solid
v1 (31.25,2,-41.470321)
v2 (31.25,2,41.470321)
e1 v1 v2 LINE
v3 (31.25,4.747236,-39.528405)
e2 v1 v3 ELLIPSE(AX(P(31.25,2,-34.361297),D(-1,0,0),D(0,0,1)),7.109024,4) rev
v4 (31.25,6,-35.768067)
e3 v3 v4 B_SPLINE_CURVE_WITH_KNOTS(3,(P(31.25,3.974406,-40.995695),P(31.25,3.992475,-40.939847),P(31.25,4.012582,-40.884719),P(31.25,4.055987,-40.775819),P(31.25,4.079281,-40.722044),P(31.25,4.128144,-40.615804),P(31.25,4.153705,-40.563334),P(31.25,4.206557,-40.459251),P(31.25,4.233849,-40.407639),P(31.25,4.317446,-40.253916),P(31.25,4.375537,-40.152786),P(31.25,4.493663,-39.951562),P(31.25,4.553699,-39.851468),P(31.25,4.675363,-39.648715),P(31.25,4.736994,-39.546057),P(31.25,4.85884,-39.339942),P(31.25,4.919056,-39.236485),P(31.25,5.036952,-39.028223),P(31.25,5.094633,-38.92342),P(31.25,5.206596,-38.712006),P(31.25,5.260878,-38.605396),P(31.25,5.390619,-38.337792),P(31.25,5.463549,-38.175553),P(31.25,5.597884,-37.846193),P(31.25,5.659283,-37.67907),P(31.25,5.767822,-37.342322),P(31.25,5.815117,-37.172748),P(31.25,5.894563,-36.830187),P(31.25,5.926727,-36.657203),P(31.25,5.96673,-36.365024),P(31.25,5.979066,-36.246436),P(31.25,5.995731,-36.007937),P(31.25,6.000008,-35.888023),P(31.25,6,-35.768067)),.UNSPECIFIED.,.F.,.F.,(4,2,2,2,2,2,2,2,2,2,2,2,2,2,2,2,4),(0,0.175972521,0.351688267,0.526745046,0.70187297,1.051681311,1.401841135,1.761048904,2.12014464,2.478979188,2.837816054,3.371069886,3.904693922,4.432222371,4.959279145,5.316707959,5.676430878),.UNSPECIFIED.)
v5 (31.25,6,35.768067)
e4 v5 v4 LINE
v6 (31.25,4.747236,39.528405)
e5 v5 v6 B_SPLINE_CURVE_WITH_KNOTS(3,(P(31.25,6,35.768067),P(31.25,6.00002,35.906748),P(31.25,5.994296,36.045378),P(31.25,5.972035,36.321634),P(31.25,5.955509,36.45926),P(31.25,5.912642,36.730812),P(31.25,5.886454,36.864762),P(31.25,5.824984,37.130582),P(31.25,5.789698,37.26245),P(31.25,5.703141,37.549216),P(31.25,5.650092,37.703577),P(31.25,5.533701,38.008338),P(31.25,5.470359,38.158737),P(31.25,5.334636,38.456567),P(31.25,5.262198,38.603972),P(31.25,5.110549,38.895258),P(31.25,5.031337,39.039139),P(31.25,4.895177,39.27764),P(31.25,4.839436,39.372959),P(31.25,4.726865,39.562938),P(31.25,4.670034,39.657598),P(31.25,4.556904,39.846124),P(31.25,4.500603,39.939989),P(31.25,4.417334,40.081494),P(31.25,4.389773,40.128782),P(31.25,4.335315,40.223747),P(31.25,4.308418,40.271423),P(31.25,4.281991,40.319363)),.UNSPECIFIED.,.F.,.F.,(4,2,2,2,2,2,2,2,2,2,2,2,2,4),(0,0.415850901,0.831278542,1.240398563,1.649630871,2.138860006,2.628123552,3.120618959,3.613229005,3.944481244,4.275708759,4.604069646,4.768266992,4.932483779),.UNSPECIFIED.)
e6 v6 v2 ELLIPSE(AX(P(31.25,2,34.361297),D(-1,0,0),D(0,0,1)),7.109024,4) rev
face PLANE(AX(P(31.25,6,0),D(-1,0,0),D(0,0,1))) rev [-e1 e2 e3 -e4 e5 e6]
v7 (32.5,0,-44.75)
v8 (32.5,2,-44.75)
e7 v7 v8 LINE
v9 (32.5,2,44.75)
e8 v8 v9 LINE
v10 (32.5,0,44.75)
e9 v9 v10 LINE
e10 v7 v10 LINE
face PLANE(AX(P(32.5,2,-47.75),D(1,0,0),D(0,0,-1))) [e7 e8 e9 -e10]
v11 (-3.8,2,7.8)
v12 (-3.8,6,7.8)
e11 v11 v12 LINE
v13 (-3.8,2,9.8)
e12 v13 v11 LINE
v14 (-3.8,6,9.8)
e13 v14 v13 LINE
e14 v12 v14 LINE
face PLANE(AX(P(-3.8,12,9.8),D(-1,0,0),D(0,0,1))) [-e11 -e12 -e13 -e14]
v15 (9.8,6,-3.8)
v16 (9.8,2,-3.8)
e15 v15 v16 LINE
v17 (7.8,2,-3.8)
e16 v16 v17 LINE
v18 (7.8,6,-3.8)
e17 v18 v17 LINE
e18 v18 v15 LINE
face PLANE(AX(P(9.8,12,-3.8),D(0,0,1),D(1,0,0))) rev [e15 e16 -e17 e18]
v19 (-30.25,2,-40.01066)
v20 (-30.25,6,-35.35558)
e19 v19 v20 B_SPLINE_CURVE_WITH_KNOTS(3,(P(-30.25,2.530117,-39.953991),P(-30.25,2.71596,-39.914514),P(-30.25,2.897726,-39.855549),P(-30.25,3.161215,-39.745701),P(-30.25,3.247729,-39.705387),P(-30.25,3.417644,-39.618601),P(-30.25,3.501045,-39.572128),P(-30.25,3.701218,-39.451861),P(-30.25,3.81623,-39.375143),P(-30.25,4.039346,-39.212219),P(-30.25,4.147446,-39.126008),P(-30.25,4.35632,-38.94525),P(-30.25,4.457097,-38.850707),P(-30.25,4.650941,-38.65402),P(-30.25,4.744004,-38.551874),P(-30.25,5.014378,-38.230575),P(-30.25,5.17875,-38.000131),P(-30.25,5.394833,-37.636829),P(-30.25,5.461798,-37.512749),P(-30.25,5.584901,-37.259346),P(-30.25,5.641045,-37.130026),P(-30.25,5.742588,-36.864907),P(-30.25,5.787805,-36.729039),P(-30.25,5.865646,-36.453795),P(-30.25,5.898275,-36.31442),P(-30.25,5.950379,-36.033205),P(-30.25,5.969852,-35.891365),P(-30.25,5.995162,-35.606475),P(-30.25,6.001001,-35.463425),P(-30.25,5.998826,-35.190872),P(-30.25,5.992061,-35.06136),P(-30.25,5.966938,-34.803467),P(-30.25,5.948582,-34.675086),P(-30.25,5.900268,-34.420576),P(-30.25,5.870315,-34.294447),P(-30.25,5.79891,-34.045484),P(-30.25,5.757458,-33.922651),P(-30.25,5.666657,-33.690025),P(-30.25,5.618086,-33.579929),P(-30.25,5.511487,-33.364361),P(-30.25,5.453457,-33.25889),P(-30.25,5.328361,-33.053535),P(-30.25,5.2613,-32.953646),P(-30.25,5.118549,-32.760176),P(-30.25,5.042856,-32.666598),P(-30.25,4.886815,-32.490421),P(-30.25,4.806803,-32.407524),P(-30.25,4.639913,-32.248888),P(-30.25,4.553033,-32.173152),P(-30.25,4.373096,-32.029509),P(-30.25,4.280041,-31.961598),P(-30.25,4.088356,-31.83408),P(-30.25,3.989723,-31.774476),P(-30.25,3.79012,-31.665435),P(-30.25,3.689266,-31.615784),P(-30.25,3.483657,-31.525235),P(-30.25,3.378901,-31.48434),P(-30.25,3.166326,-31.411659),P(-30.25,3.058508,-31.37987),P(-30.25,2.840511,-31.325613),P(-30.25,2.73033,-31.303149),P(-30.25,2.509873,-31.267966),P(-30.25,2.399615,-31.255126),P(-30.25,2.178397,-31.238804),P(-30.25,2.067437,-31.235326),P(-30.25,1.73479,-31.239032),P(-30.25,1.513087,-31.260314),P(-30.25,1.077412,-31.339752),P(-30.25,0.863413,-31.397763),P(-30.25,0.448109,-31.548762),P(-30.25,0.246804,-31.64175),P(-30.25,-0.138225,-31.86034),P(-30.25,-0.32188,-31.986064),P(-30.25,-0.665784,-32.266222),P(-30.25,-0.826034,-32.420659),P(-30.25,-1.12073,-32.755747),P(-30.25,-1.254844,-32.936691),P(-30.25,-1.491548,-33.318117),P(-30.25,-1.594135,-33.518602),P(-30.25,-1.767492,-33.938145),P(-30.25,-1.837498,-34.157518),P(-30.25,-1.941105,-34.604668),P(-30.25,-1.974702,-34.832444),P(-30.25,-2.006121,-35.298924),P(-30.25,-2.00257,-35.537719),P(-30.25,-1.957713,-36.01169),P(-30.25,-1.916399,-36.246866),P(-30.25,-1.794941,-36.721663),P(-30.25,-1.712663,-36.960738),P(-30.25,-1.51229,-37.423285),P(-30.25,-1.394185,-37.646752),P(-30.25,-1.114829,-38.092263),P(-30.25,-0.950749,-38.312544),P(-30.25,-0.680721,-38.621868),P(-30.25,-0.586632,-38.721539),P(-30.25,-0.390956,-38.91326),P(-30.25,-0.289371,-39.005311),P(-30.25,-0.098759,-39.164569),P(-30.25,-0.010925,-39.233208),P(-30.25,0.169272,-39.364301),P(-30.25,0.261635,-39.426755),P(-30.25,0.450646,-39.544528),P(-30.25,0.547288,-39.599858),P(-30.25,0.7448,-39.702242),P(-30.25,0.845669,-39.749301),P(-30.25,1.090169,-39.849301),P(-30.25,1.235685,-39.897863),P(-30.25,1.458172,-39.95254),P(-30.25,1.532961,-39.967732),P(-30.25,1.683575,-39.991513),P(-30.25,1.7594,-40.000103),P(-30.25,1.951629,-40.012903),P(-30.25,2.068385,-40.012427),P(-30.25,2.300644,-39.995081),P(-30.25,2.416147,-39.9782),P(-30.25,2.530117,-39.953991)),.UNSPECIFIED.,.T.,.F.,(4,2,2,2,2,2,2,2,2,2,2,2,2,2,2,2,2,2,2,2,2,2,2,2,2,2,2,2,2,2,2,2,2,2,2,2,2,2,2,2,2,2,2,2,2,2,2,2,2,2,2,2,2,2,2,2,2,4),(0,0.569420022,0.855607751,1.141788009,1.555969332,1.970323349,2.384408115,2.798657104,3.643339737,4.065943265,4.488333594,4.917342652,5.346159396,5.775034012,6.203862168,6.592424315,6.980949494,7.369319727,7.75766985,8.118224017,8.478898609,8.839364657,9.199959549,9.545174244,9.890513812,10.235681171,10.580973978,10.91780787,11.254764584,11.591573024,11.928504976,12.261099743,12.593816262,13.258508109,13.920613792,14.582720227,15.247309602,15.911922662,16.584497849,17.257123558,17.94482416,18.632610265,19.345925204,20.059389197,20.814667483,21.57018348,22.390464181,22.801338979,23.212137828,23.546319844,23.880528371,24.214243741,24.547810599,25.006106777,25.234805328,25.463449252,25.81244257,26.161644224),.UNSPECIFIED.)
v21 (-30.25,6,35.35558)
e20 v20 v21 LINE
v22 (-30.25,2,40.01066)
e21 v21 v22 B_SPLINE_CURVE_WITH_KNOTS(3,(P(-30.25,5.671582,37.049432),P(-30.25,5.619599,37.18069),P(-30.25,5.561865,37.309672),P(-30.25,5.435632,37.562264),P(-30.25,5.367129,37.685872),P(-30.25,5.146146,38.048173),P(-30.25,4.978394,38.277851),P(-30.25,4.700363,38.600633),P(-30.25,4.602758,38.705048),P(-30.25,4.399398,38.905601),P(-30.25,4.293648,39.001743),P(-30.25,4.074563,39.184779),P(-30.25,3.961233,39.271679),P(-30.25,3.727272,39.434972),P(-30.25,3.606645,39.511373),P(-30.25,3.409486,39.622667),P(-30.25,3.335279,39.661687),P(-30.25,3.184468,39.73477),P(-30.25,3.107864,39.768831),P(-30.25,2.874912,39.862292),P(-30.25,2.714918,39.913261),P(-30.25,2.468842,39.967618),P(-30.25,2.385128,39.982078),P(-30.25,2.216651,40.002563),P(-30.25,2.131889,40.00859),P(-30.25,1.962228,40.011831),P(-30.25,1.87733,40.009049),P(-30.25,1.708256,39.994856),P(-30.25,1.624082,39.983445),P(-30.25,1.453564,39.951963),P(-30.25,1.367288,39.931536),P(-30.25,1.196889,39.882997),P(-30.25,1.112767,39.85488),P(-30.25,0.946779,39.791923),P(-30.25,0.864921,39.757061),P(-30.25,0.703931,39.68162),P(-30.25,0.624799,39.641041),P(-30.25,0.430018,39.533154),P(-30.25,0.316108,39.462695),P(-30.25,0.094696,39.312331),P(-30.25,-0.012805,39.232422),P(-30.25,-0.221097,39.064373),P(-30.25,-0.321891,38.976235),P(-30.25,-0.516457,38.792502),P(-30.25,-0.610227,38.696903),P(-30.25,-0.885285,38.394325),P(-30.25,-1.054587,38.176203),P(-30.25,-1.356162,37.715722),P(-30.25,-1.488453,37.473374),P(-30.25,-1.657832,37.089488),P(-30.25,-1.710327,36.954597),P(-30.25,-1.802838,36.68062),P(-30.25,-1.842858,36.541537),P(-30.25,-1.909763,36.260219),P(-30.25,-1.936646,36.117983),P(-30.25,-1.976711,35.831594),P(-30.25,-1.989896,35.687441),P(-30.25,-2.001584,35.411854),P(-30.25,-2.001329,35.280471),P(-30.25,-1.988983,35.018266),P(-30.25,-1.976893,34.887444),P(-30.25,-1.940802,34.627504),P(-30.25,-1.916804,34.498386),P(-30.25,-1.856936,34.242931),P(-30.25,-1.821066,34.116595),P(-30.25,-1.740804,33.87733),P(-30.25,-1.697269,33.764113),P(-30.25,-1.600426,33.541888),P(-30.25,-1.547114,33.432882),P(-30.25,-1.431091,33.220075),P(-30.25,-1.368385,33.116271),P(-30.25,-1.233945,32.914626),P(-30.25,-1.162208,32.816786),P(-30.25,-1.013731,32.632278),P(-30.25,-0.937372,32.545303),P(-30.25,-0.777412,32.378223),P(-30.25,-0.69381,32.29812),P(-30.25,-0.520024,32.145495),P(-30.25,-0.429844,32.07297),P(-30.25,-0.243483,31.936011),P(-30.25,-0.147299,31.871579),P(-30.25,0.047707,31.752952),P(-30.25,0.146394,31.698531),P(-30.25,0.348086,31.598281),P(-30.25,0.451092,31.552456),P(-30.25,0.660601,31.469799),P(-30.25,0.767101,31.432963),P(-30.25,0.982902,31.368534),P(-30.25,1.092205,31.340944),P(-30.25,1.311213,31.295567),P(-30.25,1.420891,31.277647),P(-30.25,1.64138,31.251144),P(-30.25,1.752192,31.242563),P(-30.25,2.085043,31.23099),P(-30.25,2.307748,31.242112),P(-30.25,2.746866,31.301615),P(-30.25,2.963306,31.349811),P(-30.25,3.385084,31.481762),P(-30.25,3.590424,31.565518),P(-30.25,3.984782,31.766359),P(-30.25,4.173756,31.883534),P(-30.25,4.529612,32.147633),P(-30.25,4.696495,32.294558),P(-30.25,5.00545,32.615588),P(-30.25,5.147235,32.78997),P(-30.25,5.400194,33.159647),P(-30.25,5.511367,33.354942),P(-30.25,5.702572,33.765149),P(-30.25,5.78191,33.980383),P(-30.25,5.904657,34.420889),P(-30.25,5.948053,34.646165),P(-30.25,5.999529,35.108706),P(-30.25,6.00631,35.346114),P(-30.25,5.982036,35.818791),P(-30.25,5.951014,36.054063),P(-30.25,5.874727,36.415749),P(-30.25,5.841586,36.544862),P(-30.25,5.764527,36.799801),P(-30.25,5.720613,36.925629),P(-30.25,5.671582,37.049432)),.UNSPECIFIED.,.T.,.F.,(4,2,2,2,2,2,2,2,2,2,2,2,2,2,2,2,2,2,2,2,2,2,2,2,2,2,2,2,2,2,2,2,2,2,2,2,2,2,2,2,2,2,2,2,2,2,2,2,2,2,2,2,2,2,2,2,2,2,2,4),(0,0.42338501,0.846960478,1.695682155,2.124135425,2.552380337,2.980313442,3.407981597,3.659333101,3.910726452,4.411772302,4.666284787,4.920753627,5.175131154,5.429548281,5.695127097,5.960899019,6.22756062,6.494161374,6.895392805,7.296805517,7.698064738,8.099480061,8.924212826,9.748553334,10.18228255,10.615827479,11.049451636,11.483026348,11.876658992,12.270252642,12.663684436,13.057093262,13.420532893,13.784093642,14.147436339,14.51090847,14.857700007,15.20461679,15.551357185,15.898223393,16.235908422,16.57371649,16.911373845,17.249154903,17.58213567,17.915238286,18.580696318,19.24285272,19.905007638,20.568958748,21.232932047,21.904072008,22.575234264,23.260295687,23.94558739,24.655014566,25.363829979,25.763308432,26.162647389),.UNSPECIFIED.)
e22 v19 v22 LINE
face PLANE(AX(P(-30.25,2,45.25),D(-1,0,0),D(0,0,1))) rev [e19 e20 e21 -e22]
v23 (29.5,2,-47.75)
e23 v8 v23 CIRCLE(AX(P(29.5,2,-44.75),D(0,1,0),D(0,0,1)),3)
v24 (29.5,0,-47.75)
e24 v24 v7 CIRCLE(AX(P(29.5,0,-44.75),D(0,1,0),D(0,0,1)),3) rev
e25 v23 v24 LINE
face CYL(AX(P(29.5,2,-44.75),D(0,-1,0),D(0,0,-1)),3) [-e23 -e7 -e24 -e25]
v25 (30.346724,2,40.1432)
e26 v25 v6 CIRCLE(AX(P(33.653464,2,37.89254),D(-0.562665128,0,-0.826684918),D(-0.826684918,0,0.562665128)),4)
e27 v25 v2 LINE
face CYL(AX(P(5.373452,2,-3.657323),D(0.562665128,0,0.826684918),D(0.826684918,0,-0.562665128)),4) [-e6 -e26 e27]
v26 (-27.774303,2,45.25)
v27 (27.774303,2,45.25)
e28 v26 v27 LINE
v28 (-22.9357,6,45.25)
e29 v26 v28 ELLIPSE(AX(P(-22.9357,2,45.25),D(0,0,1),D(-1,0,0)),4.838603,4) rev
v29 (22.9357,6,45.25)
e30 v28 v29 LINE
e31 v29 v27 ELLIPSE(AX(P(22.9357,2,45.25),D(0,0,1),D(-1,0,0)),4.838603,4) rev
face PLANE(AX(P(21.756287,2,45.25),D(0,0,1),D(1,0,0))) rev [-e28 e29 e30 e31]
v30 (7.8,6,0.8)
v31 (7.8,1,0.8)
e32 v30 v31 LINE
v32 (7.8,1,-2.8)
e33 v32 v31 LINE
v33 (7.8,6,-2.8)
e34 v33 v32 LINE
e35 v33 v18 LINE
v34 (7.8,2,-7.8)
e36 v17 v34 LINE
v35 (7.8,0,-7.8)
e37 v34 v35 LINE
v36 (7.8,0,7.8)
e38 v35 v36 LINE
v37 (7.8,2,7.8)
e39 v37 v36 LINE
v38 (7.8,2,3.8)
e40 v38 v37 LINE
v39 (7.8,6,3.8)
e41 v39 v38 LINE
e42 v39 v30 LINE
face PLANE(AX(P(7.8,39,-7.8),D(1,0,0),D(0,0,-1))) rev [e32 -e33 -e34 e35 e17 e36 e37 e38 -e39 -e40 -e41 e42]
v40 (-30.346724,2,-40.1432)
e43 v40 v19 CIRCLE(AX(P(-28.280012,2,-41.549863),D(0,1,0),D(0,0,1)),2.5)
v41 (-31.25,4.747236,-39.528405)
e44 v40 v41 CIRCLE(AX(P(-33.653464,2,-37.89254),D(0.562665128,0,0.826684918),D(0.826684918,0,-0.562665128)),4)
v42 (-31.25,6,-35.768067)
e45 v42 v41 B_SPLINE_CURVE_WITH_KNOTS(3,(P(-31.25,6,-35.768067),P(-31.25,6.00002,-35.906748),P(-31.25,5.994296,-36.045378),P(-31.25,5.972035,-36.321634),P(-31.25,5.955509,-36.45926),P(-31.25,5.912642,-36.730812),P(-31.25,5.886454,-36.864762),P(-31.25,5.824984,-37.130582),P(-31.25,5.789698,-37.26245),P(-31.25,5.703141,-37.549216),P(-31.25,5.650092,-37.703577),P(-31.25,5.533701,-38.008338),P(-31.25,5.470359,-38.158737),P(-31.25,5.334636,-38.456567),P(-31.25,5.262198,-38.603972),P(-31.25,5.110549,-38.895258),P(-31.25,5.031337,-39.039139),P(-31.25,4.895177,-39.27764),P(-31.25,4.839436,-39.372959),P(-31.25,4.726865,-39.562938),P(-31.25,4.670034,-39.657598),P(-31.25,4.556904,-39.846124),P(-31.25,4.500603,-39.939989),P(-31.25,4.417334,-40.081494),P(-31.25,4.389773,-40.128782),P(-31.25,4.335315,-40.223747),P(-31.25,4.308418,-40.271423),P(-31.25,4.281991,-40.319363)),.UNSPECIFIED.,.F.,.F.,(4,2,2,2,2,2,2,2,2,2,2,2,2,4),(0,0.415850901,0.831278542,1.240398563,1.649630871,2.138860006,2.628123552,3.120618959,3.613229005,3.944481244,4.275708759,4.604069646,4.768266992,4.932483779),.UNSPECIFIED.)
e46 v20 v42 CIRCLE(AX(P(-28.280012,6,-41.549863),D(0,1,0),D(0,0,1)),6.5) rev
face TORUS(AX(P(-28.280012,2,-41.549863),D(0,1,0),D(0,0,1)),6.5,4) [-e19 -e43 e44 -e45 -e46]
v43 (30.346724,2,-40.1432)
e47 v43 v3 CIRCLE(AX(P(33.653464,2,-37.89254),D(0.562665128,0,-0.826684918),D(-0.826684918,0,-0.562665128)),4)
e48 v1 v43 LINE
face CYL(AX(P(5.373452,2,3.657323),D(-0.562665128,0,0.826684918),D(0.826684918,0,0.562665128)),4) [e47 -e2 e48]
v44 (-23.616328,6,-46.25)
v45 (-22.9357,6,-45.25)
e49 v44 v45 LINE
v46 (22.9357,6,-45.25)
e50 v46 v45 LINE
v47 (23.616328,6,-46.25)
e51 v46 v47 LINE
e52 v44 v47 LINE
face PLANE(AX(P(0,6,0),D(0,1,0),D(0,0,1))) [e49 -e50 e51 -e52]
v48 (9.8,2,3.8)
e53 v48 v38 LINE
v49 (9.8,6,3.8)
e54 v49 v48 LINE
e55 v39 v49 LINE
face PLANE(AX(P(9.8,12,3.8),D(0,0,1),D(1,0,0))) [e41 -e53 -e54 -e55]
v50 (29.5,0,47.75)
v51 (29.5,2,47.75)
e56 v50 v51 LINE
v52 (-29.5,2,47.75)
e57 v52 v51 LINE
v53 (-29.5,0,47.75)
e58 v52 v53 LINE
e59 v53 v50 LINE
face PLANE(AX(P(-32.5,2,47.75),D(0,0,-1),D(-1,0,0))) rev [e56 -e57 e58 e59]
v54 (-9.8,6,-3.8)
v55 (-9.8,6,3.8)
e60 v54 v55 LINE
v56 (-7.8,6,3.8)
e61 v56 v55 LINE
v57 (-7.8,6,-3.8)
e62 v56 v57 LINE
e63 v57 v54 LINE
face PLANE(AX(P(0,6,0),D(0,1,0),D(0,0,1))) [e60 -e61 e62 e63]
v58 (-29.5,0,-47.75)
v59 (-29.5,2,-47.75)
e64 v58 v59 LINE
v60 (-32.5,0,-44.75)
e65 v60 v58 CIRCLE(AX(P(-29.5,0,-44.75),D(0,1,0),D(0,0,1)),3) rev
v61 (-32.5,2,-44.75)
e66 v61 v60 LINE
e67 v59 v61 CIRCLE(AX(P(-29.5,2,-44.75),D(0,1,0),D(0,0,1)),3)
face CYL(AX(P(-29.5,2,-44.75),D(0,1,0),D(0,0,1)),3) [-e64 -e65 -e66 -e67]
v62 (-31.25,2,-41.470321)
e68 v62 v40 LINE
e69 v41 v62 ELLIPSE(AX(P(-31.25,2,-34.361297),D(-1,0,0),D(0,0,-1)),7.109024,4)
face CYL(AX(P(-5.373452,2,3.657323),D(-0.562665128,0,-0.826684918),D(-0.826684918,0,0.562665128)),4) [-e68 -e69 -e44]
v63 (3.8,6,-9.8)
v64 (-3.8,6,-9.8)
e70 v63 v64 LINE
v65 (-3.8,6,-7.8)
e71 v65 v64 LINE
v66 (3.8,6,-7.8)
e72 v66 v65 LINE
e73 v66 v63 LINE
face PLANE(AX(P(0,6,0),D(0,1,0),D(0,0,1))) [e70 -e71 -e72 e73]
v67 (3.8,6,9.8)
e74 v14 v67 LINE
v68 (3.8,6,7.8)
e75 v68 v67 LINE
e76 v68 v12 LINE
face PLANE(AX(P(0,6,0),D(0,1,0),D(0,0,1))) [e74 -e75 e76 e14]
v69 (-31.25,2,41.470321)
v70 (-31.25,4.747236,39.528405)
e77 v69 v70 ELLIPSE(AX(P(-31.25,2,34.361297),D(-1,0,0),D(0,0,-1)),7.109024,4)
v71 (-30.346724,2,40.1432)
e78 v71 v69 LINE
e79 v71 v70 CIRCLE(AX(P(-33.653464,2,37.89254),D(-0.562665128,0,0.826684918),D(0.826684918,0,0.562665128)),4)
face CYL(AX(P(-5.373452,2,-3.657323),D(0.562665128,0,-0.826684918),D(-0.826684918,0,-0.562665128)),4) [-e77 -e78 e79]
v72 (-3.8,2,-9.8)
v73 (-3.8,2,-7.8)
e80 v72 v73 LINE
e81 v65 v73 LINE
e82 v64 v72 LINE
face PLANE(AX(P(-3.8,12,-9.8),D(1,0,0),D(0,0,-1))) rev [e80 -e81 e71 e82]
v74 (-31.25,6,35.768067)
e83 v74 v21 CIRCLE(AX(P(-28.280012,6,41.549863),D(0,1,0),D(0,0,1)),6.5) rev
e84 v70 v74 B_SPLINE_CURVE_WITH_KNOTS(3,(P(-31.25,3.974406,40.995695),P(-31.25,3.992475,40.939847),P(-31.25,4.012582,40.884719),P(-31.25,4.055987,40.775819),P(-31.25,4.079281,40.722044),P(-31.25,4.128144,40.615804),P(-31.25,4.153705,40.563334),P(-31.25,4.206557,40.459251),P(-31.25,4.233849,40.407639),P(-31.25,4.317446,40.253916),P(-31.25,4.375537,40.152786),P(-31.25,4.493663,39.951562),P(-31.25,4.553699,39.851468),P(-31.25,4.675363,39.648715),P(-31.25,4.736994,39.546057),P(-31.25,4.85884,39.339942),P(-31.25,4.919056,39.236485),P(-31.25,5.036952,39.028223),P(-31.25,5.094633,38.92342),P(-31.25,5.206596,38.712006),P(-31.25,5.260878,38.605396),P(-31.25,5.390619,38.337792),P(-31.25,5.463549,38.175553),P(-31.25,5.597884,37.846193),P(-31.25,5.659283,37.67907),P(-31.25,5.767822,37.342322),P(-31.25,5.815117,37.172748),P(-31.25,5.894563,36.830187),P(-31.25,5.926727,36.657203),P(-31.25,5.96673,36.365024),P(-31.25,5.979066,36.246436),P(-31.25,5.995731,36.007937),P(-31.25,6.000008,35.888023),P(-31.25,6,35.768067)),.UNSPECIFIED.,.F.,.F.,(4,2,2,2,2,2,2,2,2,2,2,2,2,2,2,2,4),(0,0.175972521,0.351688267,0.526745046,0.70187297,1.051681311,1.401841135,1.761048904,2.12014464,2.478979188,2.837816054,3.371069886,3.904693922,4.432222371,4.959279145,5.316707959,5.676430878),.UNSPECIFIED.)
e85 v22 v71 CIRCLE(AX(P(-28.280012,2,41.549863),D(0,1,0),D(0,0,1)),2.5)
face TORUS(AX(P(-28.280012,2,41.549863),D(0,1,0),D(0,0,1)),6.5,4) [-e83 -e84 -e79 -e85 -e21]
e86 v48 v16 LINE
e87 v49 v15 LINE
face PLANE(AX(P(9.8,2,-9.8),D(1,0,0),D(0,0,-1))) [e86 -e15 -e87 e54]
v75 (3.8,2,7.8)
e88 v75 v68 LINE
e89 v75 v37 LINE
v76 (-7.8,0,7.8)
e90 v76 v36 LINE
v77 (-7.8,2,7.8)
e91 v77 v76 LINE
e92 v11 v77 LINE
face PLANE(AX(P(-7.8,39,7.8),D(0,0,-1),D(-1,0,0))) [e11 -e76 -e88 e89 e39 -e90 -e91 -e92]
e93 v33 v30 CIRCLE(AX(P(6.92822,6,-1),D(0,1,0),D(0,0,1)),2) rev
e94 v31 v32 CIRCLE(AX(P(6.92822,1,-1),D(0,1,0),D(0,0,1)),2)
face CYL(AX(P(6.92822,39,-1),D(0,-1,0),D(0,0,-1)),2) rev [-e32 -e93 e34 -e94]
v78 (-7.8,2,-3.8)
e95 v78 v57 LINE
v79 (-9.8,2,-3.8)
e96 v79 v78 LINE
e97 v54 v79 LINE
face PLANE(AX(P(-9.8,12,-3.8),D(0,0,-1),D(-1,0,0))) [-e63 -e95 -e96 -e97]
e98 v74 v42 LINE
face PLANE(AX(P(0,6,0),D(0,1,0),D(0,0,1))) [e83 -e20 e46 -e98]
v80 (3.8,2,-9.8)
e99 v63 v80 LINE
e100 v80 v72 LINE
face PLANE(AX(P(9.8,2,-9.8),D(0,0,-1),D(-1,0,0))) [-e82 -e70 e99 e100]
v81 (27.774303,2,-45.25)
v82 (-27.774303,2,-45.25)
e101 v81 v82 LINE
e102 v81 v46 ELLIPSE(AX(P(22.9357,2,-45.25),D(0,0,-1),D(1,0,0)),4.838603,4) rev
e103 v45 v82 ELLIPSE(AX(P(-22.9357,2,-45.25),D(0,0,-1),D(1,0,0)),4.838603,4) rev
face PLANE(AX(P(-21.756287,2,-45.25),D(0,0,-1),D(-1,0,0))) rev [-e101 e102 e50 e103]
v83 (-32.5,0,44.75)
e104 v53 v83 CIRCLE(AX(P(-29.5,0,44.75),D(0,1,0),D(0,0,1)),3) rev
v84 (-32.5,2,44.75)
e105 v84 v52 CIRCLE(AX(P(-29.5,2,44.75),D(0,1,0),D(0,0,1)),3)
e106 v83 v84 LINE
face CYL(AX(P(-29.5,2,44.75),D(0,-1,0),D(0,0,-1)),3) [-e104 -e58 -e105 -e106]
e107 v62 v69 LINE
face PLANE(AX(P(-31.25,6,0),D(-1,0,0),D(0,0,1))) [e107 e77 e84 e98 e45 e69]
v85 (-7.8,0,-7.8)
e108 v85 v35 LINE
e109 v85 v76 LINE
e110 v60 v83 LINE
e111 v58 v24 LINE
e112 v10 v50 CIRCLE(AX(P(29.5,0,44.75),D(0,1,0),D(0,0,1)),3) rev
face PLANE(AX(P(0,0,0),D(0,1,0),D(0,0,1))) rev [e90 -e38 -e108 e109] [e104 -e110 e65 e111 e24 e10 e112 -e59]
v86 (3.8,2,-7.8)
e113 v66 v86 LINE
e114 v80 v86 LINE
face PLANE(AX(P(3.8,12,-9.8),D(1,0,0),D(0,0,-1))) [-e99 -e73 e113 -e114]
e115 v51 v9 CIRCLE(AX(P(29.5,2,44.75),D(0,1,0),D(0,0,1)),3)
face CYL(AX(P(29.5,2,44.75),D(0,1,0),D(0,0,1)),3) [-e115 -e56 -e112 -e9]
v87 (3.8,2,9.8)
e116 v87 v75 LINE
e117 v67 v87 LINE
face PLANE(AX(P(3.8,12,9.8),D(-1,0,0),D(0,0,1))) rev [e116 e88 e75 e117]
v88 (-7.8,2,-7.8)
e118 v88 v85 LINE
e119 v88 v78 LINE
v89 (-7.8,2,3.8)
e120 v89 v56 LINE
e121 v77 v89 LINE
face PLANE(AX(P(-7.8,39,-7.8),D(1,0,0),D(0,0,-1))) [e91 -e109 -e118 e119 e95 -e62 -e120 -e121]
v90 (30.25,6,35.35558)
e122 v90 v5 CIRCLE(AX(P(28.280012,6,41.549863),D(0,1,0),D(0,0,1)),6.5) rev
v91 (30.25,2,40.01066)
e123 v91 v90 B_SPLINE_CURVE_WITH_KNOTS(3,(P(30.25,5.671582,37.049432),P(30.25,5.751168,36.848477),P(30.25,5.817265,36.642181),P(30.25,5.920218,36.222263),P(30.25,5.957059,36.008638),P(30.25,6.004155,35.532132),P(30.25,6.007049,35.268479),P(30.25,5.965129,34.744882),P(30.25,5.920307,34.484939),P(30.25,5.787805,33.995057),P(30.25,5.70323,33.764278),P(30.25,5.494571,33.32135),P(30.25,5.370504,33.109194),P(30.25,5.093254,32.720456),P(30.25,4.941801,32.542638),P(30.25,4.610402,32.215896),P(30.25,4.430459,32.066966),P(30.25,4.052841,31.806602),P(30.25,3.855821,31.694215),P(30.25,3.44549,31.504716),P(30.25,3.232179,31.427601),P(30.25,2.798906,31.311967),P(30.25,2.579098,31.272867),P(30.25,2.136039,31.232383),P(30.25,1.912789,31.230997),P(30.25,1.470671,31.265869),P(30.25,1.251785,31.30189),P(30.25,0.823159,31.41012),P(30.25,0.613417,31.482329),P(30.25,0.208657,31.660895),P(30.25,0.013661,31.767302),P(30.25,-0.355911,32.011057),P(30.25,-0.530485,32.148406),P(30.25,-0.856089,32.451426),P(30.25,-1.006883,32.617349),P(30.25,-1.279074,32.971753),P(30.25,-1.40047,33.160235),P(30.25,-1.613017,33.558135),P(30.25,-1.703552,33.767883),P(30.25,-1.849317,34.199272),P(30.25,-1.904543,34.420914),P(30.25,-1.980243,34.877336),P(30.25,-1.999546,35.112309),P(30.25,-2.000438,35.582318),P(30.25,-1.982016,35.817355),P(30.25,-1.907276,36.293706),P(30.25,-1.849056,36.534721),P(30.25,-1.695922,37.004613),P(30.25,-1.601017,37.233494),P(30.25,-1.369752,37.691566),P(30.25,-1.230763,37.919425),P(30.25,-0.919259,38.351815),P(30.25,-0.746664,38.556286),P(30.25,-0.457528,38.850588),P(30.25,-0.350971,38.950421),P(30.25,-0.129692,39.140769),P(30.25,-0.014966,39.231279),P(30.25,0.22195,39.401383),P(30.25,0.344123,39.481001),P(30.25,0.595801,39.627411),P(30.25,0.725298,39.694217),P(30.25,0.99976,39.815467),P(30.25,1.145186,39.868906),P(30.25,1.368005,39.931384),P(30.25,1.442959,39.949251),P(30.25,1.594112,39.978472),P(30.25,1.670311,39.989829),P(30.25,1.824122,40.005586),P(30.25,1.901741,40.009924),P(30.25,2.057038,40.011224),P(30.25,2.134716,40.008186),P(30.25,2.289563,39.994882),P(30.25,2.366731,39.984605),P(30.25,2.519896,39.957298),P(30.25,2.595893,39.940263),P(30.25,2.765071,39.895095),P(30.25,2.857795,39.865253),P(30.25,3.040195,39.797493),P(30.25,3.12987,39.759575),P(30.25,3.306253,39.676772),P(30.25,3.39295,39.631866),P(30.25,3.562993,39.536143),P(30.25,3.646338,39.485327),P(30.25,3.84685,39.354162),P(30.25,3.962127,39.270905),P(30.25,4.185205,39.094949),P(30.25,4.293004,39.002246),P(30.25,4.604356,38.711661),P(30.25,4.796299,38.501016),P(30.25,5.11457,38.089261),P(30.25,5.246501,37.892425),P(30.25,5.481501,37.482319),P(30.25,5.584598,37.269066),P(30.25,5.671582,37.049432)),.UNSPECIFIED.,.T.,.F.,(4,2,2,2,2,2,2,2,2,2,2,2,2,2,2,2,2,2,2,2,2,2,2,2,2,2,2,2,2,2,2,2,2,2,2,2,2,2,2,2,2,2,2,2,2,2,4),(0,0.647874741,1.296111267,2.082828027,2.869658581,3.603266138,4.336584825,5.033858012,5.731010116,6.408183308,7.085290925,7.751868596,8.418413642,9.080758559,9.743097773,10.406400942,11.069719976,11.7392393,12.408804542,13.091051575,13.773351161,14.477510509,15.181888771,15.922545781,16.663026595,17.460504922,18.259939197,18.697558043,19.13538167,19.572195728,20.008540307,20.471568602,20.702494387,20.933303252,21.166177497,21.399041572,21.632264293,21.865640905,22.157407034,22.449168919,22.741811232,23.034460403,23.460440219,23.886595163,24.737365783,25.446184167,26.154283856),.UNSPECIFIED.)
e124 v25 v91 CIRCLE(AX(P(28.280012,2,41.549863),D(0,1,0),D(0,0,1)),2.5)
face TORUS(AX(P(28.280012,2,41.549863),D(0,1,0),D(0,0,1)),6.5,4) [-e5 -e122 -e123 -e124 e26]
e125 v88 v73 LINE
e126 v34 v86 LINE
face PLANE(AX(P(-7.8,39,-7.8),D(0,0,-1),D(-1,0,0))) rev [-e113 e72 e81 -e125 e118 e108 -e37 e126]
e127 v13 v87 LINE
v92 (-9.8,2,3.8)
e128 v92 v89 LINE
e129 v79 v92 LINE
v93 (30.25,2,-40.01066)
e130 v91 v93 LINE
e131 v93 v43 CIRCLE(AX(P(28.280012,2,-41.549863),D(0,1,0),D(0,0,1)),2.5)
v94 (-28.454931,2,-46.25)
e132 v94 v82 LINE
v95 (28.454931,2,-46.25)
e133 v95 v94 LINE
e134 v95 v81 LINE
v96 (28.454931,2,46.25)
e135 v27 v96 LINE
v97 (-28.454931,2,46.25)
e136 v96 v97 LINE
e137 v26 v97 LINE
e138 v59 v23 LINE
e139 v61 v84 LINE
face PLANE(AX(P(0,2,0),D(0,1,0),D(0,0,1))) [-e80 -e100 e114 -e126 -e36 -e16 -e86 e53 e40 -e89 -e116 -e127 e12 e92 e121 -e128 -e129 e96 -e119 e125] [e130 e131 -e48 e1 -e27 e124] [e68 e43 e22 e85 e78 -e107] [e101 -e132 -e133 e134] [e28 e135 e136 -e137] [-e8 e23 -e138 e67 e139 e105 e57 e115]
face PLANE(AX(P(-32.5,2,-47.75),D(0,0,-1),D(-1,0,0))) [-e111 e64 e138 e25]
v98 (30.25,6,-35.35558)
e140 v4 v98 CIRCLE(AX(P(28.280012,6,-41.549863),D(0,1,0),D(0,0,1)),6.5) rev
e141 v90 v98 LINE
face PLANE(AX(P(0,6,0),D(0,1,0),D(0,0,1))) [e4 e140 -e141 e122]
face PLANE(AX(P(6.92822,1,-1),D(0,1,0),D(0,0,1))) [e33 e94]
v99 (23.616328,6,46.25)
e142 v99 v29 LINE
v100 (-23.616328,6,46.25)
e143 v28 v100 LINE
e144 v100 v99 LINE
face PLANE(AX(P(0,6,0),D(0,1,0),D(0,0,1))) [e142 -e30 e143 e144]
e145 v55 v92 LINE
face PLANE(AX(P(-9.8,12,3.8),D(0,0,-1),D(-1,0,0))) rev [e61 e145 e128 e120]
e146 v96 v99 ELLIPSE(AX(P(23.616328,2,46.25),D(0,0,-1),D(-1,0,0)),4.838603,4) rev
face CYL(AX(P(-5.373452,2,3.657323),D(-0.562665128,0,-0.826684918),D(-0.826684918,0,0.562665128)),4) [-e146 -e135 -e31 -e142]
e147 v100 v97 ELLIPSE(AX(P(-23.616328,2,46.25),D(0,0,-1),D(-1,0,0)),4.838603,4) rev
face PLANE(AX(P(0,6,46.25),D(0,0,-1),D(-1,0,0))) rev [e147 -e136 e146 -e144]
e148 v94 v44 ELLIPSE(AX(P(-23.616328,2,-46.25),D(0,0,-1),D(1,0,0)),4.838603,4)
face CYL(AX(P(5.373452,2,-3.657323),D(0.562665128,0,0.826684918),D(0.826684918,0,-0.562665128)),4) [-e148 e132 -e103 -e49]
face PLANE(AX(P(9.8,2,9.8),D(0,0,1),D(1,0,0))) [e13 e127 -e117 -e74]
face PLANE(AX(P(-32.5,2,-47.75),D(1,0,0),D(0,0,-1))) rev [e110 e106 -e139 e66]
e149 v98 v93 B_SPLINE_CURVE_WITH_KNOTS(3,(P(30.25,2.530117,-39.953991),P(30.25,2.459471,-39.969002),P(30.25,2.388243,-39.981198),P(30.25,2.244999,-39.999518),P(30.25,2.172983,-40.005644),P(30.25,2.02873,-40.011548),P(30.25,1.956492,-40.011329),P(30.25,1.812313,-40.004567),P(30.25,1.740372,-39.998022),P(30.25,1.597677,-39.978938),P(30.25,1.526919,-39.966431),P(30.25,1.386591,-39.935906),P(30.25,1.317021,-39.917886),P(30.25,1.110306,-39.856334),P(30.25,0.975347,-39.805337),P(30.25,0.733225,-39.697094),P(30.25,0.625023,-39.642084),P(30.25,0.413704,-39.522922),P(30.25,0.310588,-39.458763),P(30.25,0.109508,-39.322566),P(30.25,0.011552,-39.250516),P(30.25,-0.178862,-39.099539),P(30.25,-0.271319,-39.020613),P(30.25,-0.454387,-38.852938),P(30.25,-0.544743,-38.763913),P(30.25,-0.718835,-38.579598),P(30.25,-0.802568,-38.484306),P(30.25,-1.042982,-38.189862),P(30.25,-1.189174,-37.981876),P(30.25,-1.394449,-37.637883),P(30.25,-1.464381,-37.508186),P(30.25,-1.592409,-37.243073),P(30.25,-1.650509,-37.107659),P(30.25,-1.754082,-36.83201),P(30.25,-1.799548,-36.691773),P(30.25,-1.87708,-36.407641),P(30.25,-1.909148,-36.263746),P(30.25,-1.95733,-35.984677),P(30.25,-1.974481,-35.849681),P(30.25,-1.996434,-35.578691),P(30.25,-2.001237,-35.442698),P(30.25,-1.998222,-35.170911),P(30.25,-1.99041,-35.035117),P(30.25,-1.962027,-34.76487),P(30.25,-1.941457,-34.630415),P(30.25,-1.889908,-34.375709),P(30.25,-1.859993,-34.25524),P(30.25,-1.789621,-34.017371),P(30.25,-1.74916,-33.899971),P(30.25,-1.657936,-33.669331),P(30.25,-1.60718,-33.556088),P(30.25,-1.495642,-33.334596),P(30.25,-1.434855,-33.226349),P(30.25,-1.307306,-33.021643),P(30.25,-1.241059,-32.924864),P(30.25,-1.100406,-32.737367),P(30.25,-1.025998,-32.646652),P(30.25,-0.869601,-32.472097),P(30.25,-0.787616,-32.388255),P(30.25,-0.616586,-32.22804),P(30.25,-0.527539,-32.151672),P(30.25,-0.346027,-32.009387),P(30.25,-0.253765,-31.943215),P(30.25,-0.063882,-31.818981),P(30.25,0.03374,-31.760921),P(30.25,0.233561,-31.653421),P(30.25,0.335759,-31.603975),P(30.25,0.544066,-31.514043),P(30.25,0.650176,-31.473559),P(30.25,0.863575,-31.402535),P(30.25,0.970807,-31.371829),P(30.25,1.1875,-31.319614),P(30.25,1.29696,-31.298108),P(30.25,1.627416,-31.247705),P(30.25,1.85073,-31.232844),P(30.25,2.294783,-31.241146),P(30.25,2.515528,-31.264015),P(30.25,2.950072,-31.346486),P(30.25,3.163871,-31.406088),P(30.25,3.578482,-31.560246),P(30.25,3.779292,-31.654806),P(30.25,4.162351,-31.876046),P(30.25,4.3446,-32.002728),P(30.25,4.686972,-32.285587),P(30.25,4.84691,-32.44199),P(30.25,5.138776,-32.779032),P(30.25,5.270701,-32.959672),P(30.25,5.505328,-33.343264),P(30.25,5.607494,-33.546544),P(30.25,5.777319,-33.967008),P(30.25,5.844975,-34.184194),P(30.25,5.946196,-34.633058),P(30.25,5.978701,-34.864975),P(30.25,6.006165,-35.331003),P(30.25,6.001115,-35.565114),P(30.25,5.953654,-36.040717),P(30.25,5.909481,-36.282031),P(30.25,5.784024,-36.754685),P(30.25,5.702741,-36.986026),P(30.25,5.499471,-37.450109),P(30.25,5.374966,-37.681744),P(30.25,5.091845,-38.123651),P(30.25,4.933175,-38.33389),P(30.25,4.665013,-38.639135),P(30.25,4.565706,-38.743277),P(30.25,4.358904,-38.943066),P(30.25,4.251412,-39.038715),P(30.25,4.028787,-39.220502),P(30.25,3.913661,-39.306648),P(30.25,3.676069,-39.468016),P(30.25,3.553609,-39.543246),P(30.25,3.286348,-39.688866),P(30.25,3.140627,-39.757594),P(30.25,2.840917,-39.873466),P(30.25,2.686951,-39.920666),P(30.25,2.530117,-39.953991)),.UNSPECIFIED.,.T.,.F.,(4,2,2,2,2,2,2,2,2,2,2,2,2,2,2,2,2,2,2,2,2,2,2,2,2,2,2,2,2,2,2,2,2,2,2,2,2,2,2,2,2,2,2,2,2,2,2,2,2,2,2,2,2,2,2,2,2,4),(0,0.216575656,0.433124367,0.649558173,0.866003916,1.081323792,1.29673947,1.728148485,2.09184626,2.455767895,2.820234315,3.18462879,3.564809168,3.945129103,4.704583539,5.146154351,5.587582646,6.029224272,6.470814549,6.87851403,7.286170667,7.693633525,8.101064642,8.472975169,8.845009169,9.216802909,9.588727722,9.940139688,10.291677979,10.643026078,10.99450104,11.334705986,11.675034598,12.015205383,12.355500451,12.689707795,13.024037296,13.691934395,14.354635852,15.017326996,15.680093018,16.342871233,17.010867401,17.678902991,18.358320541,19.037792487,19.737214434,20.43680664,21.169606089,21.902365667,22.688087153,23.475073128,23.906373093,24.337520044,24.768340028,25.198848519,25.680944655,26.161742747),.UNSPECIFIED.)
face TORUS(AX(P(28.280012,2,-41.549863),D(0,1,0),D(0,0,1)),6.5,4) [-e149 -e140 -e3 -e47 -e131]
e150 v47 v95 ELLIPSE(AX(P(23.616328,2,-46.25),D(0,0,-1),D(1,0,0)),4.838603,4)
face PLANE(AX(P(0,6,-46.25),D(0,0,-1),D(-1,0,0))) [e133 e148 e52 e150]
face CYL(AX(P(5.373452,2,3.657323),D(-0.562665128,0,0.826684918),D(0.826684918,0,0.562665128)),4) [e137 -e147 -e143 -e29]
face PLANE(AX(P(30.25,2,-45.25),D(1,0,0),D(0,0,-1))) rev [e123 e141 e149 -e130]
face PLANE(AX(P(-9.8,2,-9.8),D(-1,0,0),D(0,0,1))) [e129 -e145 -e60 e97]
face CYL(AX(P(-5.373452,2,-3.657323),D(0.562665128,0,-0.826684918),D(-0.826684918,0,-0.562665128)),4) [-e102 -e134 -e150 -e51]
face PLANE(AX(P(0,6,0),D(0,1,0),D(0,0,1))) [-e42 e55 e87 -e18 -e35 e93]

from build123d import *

# Parameters (mm, degrees)
BOSS_EXTRUDE1_DEPTH = 2
SKETCH1_3_W         = 62.50000000000001
SKETCH1_3_H         = 92.5
BOSS_EXTRUDE2_DEPTH = 6
BOSS_EXTRUDE3_DEPTH = 6
CUT_EXTRUDE2_DEPTH  = 39.00000000000001
CUT_EXTRUDE3_START  = 2
CUT_EXTRUDE3_DEPTH  = 8
FILLET1_R           = 4
BOSS_EXTRUDE4_DEPTH = 1
CUT_EXTRUDE7_DEPTH  = 4
FILLET2_R           = 3
SKETCH9_W           = 5.999999999999999
SKETCH9_H           = 6
SKETCH9_H_2         = 5.999999999999999
CUT_EXTRUDE8_DEPTH  = 10


with BuildPart() as part:
    # Sketch1 → Boss-Extrude1 (new body)
    with BuildSketch(Plane(origin=(0, 0, 0), x_dir=(1, 0, 0), z_dir=(0, 1, 0))):
        Polygon((-32.5, 47.74999999999999), (32.5, 47.74999999999999), (32.50000000000001, -47.75000000000001), (-32.49999999999998, -47.75000000000001), align=None)
    extrude(amount=BOSS_EXTRUDE1_DEPTH)

    # Sketch1<3> → Boss-Extrude2 (add)
    with BuildSketch(Plane(origin=(0, 0, 0), x_dir=(1, 0, 0), z_dir=(0, 1, 0))):
        Rectangle(SKETCH1_3_W, SKETCH1_3_H)
    extrude(amount=BOSS_EXTRUDE2_DEPTH)

    # Sketch2<4> → Boss-Extrude3 (add)
    with BuildSketch(Plane(origin=(0, 0, 0), x_dir=(1, 0, 0), z_dir=(0, 1, 0))):
        Polygon((-9.799999999999999, -9.799999999999999), (9.799999999999999, -9.799999999999999), (9.799999999999997, 9.799999999999999), (-9.8, 9.799999999999999), align=None)
    extrude(amount=BOSS_EXTRUDE3_DEPTH)

    # Sketch2 → Cut-Extrude2 (cut)
    with BuildSketch(Plane(origin=(0, 0, 0), x_dir=(1, 0, 0), z_dir=(0, 1, 0))):
        with BuildLine():
            Line((-7.800000000000002, 7.800000000000001), (-7.8, -7.799999999999999))
            Line((-7.8, -7.799999999999999), (7.8, -7.799999999999999))
            Line((7.8, -7.799999999999999), (7.8, -0.7999999999999989))
            ThreePointArc((7.8, -0.7999999999999985), (8.928220211291862, 1.0000000000000016), (7.799999999999999, 2.8000000000000007))
            Line((7.7999999999999785, 2.8000000000000007), (7.799999999999998, 7.800000000000001))
            Line((7.799999999999998, 7.800000000000001), (-7.800000000000002, 7.800000000000001))
        make_face()
    extrude(amount=CUT_EXTRUDE2_DEPTH, mode=Mode.SUBTRACT)

    # Sketch3 → Cut-Extrude3 (cut)
    with BuildSketch(Plane(origin=(0, 0, 0), x_dir=(1, 0, 0), z_dir=(0, 1, 0)).offset(CUT_EXTRUDE3_START)):
        with BuildLine():
            Line((-30.43328770425558, 49.15666281909306), (-34.56671229574442, 46.343337180906936))
            Line((-34.56671229574442, 46.343337180906936), (-30.34672383846524, 40.14320029367368))
            ThreePointArc((-30.346723838465234, 40.14320029367369), (-26.87334872362776, 39.48315081702232), (-26.213299246976405, 42.9565259318598))
            Line((-26.2132992469764, 42.9565259318598), (-30.43328770425558, 49.15666281909306))
        make_face()
        with BuildLine():
            Line((34.56671229574442, 46.343337180906936), (30.43328770425558, 49.15666281909306))
            Line((30.43328770425558, 49.15666281909306), (26.21329924697641, 42.9565259318598))
            ThreePointArc((26.213299246976415, 42.956525931859794), (26.87334872362777, 39.48315081702232), (30.346723838465245, 40.14320029367368))
            Line((30.346723838465245, 40.14320029367368), (34.56671229574442, 46.343337180906936))
        make_face()
        with BuildLine():
            Line((-30.346723838465223, -40.143200293673694), (-34.566712295744395, -46.34333718090695))
            Line((-34.566712295744395, -46.34333718090695), (-30.43328770425555, -49.15666281909307))
            Line((-30.43328770425555, -49.15666281909307), (-26.213299246976373, -42.95652593185982))
            ThreePointArc((-26.213299246976383, -42.956525931859815), (-26.873348723627743, -39.48315081702233), (-30.346723838465227, -40.143200293673694))
        make_face()
        with BuildLine():
            Line((26.213299246976398, -42.95652593185982), (30.433287704255594, -49.15666281909309))
            Line((30.433287704255594, -49.15666281909309), (34.56671229574444, -46.34333718090698))
            Line((34.56671229574444, -46.34333718090698), (30.34672383846524, -40.143200293673694))
            ThreePointArc((30.346723838465252, -40.14320029367369), (26.873348723627778, -39.48315081702233), (26.213299246976423, -42.95652593185981))
        make_face()
    extrude(amount=CUT_EXTRUDE3_DEPTH, mode=Mode.SUBTRACT)

    # Fillet1
    # the kernel refuses this fillet: 4 mm, written as the material it takes off along each edge
    with BuildSketch(Plane(origin=(-36.87665127637225, 6, 49.73717060629096), x_dir=(-0.8266849182977679, 0, -0.5626651276372232), z_dir=(0.5626651276372232, 0, -0.826684918297768))) as fillet1_piece_1:
        with BuildLine():
            CenterArc((FILLET1_R, -FILLET1_R), FILLET1_R, 90, 90)
            Line((0, -FILLET1_R), (0, 0))
            Line((0, 0), (FILLET1_R, 0))
        make_face()
    extrude(amount=11.605353019348973, mode=Mode.SUBTRACT)
    with BuildSketch(Plane(origin=(-26.213299246976373, 6, 42.95652593185982), x_dir=(0.8266849182977672, 0, 0.5626651276372243), z_dir=(-0.5626651276372243, 0, 0.8266849182977672))) as fillet1_piece_2:
        with BuildLine():
            CenterArc((FILLET1_R, -FILLET1_R), FILLET1_R, 90, 90)
            Line((-1.06e-15, -FILLET1_R), (0, 0))
            Line((0, 0), (FILLET1_R, 0))
        make_face()
    extrude(amount=13.983953251405376, mode=Mode.SUBTRACT)
    with BuildSketch(Plane(origin=(34.0815820880514, 6, 54.51684918297768), x_dir=(-0.826684918297767, 0, 0.5626651276372246), z_dir=(-0.5626651276372246, 0, -0.826684918297767))) as fillet1_piece_3:
        with BuildLine():
            CenterArc((FILLET1_R, -FILLET1_R), FILLET1_R, 90, 90)
            Line((-1.88e-15, -FILLET1_R), (0, 0))
            Line((0, 0), (FILLET1_R, 0))
        make_face()
    extrude(amount=13.983953251405392, mode=Mode.SUBTRACT)
    with BuildSketch(Plane(origin=(30.346723838465245, 6, 40.1432002936737), x_dir=(0.8266849182977677, 0, -0.5626651276372238), z_dir=(0.5626651276372238, 0, 0.8266849182977677))) as fillet1_piece_4:
        with BuildLine():
            CenterArc((FILLET1_R, -FILLET1_R), FILLET1_R, 90, 90)
            Line((0, -FILLET1_R), (0, 0))
            Line((0, 0), (FILLET1_R, 0))
        make_face()
    extrude(amount=11.605353019348959, mode=Mode.SUBTRACT)
    with BuildSketch(Plane(origin=(36.87665127637224, 6, -49.73717060629088), x_dir=(0.8266849182977675, 0, 0.562665127637224), z_dir=(-0.562665127637224, 0, 0.8266849182977676))) as fillet1_piece_5:
        with BuildLine():
            CenterArc((FILLET1_R, -FILLET1_R), FILLET1_R, 90, 90)
            Line((-4e-15, -FILLET1_R), (0, 0))
            Line((0, 0), (FILLET1_R, 0))
        make_face()
    extrude(amount=11.605353019348904, mode=Mode.SUBTRACT)
    with BuildSketch(Plane(origin=(26.21329924697641, 6, -42.9565259318598), x_dir=(-0.826684918297768, 0, -0.5626651276372232), z_dir=(0.5626651276372232, 0, -0.826684918297768))) as fillet1_piece_6:
        with BuildLine():
            CenterArc((FILLET1_R, -FILLET1_R), FILLET1_R, 90, 90)
            Line((-1.88e-15, -FILLET1_R), (0, 0))
            Line((0, 0), (FILLET1_R, 0))
        make_face()
    extrude(amount=13.98395325140539, mode=Mode.SUBTRACT)
    with BuildSketch(Plane(origin=(-34.08158208805138, 6, -54.51684918297765), x_dir=(0.8266849182977676, 0, -0.562665127637224), z_dir=(0.562665127637224, 0, 0.8266849182977676))) as fillet1_piece_7:
        with BuildLine():
            CenterArc((FILLET1_R, -FILLET1_R), FILLET1_R, 90, 90)
            Line((0, -FILLET1_R), (0, 0))
            Line((0, 0), (FILLET1_R, 0))
        make_face()
    extrude(amount=13.983953251405376, mode=Mode.SUBTRACT)
    with BuildSketch(Plane(origin=(-30.34672383846524, 6, -40.14320029367368), x_dir=(-0.8266849182977674, 0, 0.5626651276372242), z_dir=(-0.5626651276372242, 0, -0.8266849182977674))) as fillet1_piece_8:
        with BuildLine():
            CenterArc((FILLET1_R, -FILLET1_R), FILLET1_R, 90, 90)
            Line((1.06e-15, -FILLET1_R), (0, 0))
            Line((0, 0), (FILLET1_R, 0))
        make_face()
    extrude(amount=11.605353019348907, mode=Mode.SUBTRACT)
    with BuildSketch(Plane(origin=(-28.2800115427208, 6, 41.549863112766744), x_dir=(-0.8266849182977704, 0, -0.5626651276372198), z_dir=(-0.5626651276372198, 0, 0.8266849182977704))) as fillet1_piece_9:
        with BuildLine():
            CenterArc((2.5000000000000013 + FILLET1_R, FILLET1_R), FILLET1_R, 180, 90)
            Line((2.4999999999999996, FILLET1_R), (2.5000000000000013, 0))
            Line((2.5000000000000013, 0), (2.5000000000000013 + FILLET1_R, 0))
        make_face()
    revolve(axis=Axis((-28.2800115427208, 6, 41.549863112766744), (0, -1, 0)), revolution_arc=180.0000000000006, mode=Mode.SUBTRACT)
    with BuildSketch(Plane(origin=(28.280011542720835, 6, 41.549863112766744), x_dir=(-0.8266849182977659, 0, 0.5626651276372262), z_dir=(0.5626651276372262, 0, 0.8266849182977659))) as fillet1_piece_10:
        with BuildLine():
            CenterArc((2.499999999999998 + FILLET1_R, FILLET1_R), FILLET1_R, 180, 90)
            Line((2.4999999999999996, FILLET1_R), (2.499999999999998, 0))
            Line((2.499999999999998, 0), (2.499999999999998 + FILLET1_R, 0))
        make_face()
    revolve(axis=Axis((28.280011542720835, 6, 41.549863112766744), (0, -1, 0)), revolution_arc=180.00000000000017, mode=Mode.SUBTRACT)
    with BuildSketch(Plane(origin=(28.28001154272083, 6, -41.54986311276673), x_dir=(0.826684918297769, 0, 0.5626651276372218), z_dir=(0.5626651276372218, 0, -0.826684918297769))) as fillet1_piece_11:
        with BuildLine():
            CenterArc((2.499999999999993 + FILLET1_R, FILLET1_R), FILLET1_R, 180, 90)
            Line((2.49999999999999, FILLET1_R), (2.499999999999993, 0))
            Line((2.499999999999993, 0), (2.499999999999993 + FILLET1_R, 0))
        make_face()
    revolve(axis=Axis((28.28001154272083, 6, -41.54986311276673), (0, -1, 0)), revolution_arc=180.00000000000037, mode=Mode.SUBTRACT)
    with BuildSketch(Plane(origin=(-28.280011542720814, 6, -41.54986311276674), x_dir=(0.8266849182977655, 0, -0.562665127637227), z_dir=(-0.562665127637227, 0, -0.8266849182977655))) as fillet1_piece_12:
        with BuildLine():
            CenterArc((2.499999999999995 + FILLET1_R, FILLET1_R), FILLET1_R, 180, 90)
            Line((2.499999999999995, FILLET1_R), (2.499999999999995, 0))
            Line((2.499999999999995, 0), (2.499999999999995 + FILLET1_R, 0))
        make_face()
    revolve(axis=Axis((-28.280011542720814, 6, -41.54986311276674), (0, -1, 0)), revolution_arc=180.0000000000004, mode=Mode.SUBTRACT)

    # Sketch7 → Boss-Extrude4 (add)
    with BuildSketch(Plane(origin=(0, 0, 0), x_dir=(1, 0, 0), z_dir=(0, 1, 0))):
        with BuildLine():
            Line((7.799999999999999, 2.8000000000000003), (7.799999999999998, -0.799999999999999))
            ThreePointArc((7.799999999999998, -0.799999999999999), (8.928220211291862, 1.0000000000000004), (7.799999999999999, 2.8000000000000003))
        make_face()
    extrude(amount=BOSS_EXTRUDE4_DEPTH)

    # Sketch5 → Cut-Extrude7 (cut)
    with BuildSketch(Plane(origin=(0, 6, 0), x_dir=(1, 0, 0), z_dir=(0, 1, 0))):
        Polygon((-21.75628660862557, -45.25000000000001), (21.756286608625608, -45.25000000000001), (30.25, -45.25000000000001), (30.25, -34.31321019320602), (30.25, 34.31321019320601), (30.25, 45.24999999999999), (21.7562866086256, 45.24999999999999), (-21.75628660862558, 45.24999999999999), (-30.25, 45.24999999999999), (-30.25, 34.31321019320601), (-30.25, -34.31321019320603), (-30.25, -45.25000000000001), align=None)
        Polygon((9.799999999999999, -9.799999999999999), (-9.799999999999999, -9.799999999999999), (-9.800000000000002, 9.799999999999999), (9.799999999999995, 9.799999999999999), align=None, mode=Mode.SUBTRACT)
    extrude(amount=-CUT_EXTRUDE7_DEPTH, mode=Mode.SUBTRACT)

    # Fillet2
    fillet2_edges = [part.edges().sort_by_distance(p)[0] for p in [
        (-32.5, 1, -47.74999999999999),
        (32.5, 1, -47.74999999999999),
        (32.50000000000001, 1, 47.75000000000001),
        (-32.49999999999998, 1, 47.75000000000001),
    ]]
    fillet(fillet2_edges, radius=FILLET2_R)

    # Sketch9 → Cut-Extrude8 (cut)
    with BuildSketch(Plane(origin=(0, 2, 0), x_dir=(1, 0, 0), z_dir=(0, 1, 0))):
        Polygon((-9.800000000000002, 9.799999999999999), (-3.800000000000001, 9.799999999999999), (-3.8000000000000003, 3.7999999999999994), (-9.800000000000002, 3.7999999999999994), align=None)
        with Locations((-6.799999999999999, -6.799999999999999)):
            Rectangle(SKETCH9_W, SKETCH9_H)
        with Locations((6.799999999999999, -6.799999999999999)):
            Rectangle(SKETCH9_W, SKETCH9_H_2)
        Polygon((9.799999999999995, 9.799999999999999), (3.7999999999999954, 9.799999999999999), (3.7999999999999963, 3.7999999999999985), (9.799999999999995, 3.7999999999999994), align=None)
    extrude(amount=CUT_EXTRUDE8_DEPTH, mode=Mode.SUBTRACT)


solid = part.part
